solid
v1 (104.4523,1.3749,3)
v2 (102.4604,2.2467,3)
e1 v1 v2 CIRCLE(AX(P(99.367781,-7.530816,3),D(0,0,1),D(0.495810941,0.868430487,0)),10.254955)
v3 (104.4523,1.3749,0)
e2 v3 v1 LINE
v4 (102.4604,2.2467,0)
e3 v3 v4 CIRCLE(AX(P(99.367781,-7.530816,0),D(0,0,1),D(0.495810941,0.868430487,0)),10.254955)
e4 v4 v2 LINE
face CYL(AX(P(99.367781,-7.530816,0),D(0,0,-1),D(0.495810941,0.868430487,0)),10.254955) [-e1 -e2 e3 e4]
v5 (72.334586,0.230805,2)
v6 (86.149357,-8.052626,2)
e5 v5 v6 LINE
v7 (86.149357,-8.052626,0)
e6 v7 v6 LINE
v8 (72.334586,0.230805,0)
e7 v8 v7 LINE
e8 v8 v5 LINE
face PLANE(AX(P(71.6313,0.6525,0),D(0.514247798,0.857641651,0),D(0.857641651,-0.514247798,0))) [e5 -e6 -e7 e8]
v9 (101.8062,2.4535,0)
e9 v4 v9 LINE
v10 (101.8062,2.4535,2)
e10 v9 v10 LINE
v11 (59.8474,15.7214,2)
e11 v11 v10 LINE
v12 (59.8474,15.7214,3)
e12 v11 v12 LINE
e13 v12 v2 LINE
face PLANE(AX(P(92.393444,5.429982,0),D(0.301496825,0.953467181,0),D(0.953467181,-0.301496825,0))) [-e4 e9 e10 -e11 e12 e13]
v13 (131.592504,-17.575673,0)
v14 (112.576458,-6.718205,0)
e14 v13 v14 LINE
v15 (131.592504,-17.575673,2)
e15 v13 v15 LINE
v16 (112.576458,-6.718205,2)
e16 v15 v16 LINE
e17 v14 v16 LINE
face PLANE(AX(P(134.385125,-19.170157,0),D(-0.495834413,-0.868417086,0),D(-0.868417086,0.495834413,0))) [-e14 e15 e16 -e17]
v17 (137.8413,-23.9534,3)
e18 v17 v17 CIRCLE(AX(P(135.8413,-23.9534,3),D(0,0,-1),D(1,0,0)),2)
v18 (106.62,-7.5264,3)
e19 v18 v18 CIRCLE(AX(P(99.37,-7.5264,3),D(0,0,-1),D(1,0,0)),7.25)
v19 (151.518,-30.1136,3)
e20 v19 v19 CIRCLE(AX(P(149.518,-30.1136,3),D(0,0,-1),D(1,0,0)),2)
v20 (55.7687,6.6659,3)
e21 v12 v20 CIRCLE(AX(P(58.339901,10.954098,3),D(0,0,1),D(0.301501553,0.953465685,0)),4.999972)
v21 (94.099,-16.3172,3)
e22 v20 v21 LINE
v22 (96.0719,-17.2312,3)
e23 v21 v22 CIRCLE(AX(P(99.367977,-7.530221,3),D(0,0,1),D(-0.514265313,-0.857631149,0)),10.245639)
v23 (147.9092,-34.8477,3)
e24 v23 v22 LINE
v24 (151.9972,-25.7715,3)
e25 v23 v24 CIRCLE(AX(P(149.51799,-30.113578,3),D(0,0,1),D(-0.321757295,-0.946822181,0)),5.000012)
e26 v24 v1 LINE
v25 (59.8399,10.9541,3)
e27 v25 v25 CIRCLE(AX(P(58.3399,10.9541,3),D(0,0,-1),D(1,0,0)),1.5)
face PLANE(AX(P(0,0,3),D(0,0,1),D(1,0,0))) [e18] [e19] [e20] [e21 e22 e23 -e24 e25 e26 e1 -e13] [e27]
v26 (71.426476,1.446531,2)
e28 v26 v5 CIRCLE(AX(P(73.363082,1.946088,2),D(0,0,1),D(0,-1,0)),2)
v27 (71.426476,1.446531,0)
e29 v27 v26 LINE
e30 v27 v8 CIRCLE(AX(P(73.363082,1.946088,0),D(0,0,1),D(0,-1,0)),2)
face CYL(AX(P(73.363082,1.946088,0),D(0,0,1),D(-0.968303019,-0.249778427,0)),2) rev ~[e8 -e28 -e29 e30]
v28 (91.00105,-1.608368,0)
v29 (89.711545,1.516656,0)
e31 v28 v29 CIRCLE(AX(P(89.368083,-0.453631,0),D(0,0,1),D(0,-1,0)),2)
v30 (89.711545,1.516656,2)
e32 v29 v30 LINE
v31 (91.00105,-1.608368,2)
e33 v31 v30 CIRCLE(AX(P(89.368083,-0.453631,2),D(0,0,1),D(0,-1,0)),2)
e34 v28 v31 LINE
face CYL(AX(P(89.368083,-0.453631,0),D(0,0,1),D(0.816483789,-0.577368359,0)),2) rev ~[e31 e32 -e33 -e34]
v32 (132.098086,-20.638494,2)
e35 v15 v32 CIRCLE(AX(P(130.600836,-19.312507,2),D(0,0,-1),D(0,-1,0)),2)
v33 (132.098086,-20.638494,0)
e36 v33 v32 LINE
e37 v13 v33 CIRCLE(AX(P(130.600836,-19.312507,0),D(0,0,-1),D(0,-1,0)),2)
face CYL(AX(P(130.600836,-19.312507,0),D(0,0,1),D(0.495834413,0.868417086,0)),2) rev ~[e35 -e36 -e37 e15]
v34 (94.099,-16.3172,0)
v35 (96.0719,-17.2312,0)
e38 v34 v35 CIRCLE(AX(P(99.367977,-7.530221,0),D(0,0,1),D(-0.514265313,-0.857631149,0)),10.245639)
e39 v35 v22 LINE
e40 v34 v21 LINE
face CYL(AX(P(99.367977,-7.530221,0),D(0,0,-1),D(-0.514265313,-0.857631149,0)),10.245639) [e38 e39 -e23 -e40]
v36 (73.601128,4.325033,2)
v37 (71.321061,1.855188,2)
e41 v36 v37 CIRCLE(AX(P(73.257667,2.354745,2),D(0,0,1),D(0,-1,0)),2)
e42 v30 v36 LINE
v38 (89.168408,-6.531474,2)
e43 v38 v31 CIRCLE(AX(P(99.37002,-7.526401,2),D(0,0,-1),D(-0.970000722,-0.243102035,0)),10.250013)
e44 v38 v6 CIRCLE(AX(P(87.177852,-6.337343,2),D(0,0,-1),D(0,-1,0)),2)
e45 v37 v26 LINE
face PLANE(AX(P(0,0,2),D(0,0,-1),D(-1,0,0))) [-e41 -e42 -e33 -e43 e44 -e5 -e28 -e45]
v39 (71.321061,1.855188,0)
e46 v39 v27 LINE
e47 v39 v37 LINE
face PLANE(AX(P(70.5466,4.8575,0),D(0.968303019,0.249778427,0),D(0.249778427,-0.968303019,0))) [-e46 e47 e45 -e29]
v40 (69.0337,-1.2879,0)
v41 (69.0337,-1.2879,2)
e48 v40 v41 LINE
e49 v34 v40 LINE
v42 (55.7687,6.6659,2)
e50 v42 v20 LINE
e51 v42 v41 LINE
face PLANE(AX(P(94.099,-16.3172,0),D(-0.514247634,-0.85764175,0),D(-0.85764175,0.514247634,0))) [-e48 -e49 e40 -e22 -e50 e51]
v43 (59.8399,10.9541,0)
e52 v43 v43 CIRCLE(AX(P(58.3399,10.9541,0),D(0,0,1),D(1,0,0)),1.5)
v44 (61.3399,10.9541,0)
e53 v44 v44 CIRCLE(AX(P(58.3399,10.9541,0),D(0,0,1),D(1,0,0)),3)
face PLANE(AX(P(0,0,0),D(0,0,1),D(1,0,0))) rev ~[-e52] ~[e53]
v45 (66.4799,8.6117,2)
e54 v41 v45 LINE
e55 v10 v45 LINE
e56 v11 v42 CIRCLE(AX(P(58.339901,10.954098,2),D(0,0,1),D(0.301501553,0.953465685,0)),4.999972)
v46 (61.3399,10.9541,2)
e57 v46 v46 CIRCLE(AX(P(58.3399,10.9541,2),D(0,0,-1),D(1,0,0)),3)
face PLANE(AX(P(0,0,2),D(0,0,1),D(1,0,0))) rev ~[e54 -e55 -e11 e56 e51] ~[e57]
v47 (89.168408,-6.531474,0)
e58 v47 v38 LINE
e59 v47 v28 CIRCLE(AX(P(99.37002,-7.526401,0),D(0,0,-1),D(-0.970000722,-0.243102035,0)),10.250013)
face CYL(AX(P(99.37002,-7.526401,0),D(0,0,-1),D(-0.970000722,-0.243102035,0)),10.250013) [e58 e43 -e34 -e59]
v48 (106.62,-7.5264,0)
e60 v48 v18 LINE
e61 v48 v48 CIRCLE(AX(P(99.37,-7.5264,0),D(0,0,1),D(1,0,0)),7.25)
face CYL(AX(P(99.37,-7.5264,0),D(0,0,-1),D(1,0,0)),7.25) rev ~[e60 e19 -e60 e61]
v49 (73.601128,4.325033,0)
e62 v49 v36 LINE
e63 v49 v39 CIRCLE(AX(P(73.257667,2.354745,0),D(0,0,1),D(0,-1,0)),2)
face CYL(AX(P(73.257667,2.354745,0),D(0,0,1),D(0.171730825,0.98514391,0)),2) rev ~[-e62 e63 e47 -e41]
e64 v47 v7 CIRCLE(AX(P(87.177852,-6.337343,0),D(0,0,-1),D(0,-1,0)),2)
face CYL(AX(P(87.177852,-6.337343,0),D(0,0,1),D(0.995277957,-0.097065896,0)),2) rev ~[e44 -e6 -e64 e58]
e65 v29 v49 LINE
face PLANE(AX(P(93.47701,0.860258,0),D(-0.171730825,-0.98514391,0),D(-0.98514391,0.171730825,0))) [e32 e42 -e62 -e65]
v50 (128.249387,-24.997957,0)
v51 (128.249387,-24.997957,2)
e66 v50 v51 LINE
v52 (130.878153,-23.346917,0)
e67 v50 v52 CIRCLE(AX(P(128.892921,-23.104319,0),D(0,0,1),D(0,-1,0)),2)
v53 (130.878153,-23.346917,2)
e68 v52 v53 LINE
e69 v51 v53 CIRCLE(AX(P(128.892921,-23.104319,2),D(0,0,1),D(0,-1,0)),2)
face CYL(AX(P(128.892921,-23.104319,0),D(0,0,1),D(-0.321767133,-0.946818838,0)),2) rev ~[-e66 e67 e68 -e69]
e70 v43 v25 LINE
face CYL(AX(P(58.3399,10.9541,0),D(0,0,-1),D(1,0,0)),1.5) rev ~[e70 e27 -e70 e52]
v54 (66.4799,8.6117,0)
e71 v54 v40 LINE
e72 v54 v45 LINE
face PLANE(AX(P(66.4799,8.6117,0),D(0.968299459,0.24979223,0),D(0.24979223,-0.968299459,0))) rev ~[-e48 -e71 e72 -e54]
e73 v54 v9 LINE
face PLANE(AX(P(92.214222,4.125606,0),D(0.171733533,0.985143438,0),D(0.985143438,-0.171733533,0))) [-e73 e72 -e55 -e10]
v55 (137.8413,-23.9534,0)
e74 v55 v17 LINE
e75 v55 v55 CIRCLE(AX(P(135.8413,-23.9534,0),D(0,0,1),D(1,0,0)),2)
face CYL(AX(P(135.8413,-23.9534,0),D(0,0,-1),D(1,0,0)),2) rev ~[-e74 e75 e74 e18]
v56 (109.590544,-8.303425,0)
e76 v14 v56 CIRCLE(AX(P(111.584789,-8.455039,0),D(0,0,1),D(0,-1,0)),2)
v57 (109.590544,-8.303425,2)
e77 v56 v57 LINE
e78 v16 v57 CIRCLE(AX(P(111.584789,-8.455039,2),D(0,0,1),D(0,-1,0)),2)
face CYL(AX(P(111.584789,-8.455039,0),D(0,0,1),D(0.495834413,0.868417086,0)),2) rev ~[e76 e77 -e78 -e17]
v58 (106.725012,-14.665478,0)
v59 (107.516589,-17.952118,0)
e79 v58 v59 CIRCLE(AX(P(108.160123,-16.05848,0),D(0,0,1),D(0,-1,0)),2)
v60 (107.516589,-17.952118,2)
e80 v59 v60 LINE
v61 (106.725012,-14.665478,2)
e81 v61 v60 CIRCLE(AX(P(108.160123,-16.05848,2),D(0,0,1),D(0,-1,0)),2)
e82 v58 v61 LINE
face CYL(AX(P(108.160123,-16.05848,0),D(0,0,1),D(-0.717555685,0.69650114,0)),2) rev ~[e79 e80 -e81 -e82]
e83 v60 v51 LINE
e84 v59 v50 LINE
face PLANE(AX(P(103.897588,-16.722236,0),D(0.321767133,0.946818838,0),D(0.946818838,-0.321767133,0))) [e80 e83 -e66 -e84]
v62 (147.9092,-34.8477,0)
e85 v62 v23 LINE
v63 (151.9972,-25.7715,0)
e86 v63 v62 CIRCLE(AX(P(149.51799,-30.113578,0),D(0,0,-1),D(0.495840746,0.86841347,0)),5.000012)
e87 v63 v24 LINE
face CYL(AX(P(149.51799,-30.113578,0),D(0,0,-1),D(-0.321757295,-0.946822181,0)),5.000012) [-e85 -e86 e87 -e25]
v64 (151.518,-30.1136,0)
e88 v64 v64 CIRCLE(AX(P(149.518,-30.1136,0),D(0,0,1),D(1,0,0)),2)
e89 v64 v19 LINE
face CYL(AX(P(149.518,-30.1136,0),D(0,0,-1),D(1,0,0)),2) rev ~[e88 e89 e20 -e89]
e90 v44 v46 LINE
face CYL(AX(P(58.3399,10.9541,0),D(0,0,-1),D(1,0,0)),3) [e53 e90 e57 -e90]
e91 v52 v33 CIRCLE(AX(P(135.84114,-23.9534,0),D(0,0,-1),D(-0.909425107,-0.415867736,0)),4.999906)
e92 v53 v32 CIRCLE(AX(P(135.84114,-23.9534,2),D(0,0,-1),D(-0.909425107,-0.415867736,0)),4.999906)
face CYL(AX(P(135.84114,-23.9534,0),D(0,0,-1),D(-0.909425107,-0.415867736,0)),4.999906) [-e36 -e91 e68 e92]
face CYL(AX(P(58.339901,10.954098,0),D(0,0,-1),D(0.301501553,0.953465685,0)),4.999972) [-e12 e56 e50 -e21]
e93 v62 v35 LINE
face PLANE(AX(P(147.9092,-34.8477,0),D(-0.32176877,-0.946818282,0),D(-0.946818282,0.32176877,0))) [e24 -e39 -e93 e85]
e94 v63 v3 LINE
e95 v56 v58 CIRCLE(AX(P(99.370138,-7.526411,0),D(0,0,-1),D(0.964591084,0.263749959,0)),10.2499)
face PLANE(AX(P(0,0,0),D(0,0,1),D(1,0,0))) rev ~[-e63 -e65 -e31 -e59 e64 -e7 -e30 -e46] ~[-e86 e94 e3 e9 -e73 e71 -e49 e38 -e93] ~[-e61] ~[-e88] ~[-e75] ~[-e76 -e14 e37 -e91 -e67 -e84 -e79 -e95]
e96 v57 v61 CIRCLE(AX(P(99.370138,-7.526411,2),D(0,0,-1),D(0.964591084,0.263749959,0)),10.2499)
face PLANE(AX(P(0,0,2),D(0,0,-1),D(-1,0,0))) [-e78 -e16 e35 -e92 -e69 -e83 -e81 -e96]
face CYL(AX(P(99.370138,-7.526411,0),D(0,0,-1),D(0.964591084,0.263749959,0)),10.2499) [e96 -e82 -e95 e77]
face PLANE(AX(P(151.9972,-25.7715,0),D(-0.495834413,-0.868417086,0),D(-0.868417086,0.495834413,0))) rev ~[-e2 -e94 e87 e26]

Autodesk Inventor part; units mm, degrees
ref_plane "YZ Plane" through (0, 0, 0) normal (1, 0, 0) x (0, 1, 0)
ref_plane "XZ Plane" through (0, 0, 0) normal (0, 1, 0) x (-1, 0, 0)
ref_plane "XY Plane" through (0, 0, 0) normal (0, 0, 1) x (1, 0, 0)
sketch "スケッチ1" plane through (0, 0, 0) normal (0, 0, 1) x (1, 0, 0)
  line L0 (-170.6512, -31.4118) -> (202.8656, -31.4118) construction
  circle A0 centre (-14, -17.4118) radius 14 construction
  circle A1 centre (14, -17.4118) radius 14 construction
  circle A2 centre (-28.0204, 0.0121) radius 20.05 construction
  circle A3 centre (-28.0204, 0.0121) radius 5.05 construction
  circle A4 centre (8.8763, 3.8907) radius 32.05 construction
  circle A5 centre (8.8763, 3.8907) radius 10.1 construction
  circle A6 centre (54.047, 13.5882) radius 36.1 construction
  line L1 (-170.915, -81.4118) -> (490.0044, -81.4118)
  circle A7 centre (-28.0204, 0.0121) radius 22.342 construction
  circle A8 centre (-39.4931, 19.1835) radius 14 construction
  circle A9 centre (-49.0547, 7.5438) radius 14 construction
  circle A10 centre (-49.0547, -7.5196) radius 14 construction
  circle A11 centre (-39.4931, -19.1593) radius 14 construction
  circle A12 centre (8.8763, 3.8907) radius 33.05 construction
  circle A13 centre (54.047, 13.5882) radius 38.1 construction
  line L2 (-11.5565, -29.1593) -> (4.2969, -29.1593) construction
  line L3 (-67.2952, 44.8622) -> (-67.2952, -57.3934) construction
  line L4 (-149.4523, -1.6098) -> (-132.6633, -31.6026)
  line L5 (-132.7701, -31.4118) -> (-132.7701, 74.0456)
  circle A14 centre (-11.4931, -19.1593) radius 14 construction
  line L6 (-197.2268, -33.1593) -> (179.6604, -33.1593) construction
  circle A15 centre (54.047, 13.5882) radius 4.025 construction
  circle A16 centre (54.047, 13.5882) radius 6 construction
  circle A17 centre (-39.4931, 19.1835) radius 5
  circle A18 centre (-49.0547, 7.5438) radius 5
  circle A19 centre (-49.0547, -7.5196) radius 5
  circle A20 centre (-39.4931, -19.1593) radius 5
  circle A21 centre (-39.4931, 19.1835) radius 8 construction
  circle A22 centre (-49.0547, 7.5438) radius 8 construction
  circle A23 centre (-49.0547, -7.5196) radius 8 construction
  circle A24 centre (-39.4931, -19.1593) radius 8 construction
  circle A25 centre (-28.0204, 0.0121) radius 4.5
  circle A26 centre (8.8763, 3.8907) radius 7.5
  line L7 (-17.5497, 32.3149) -> (-46.3578, 15.0755) construction
  line L8 (-46.3578, 15.0755) -> (-51.7515, 0.0121) construction
  line L9 (-51.7515, 0.0121) -> (-46.3578, -15.0513) construction
  line L10 (-46.3578, -15.0513) -> (-37.9391, -20.0892) construction
  circle A27 centre (-32.6283, 23.2915) radius 1.3
  circle A28 centre (-46.3578, 15.0755) radius 1.3
  circle A29 centre (-51.7515, 0.0121) radius 1.3
  circle A30 centre (-46.3578, -15.0513) radius 1.3
  circle A31 centre (-32.6283, -23.2673) radius 1.3
  line L11 (-67.2952, 23.1796) -> (-67.2952, -18.1327)
  arc A32 (79.2003, -37.212) -> (87.3507, -31.2711) centre (80.4159, -30.3183) ccw
  arc A33 (8.1864, 50.8943) -> (0.9804, 51.9708) centre (3.7003, 45.5208) ccw
  line L12 (-52.2685, -33.1593) -> (56.2168, -33.1593)
  line L13 (56.2168, -33.1593) -> (79.2003, -37.212)
  arc A34 (92.7831, 8.2659) -> (29.742, 44.2162) centre (54.047, 13.5882) ccw
  line L14 (87.3507, -31.2711) -> (92.7831, 8.2659)
  line L15 (0.9804, 51.9708) -> (-67.2952, 23.1796)
  circle A35 centre (34.0114, -24.0061) radius 4.5 construction
  circle A36 centre (34.0114, -24.0061) radius 1.5
  circle A37 centre (-21.4477, 26.0369) radius 4.5 construction
  circle A38 centre (-21.4477, 26.0369) radius 1.5
  circle A39 centre (-56.0504, 23.0377) radius 1.5
  circle A40 centre (-56.0504, 23.0377) radius 3 construction
  circle A41 centre (-56.0504, 23.0377) radius 4.5 construction
  circle A42 centre (-64.2952, 0.0121) radius 1.5
  circle A43 centre (-64.2952, 0.0121) radius 3 construction
  circle A44 centre (-64.2952, 0.0121) radius 4.3311 construction
  line L16 (54.047, 13.5882) -> (99.37, -7.5264)
  line L17 (99.37, -7.5264) -> (58.3399, 10.9541)
  line L18 (58.3399, 10.9541) -> (30.7326, 32.4678)
  line L19 (30.7326, 32.4678) -> (54.047, 13.5882)
  line L20 (99.37, -7.5264) -> (491.4359, -184.1173)
  line L21 (-183.2789, 162.2213) -> (-183.2789, -125.2315)
  line L22 (516.7211, 155.5913) -> (516.7211, -155.5644)
  circle A45 centre (99.37, -7.5264) radius 7.25
  line L23 (149.518, -30.1136) -> (397.5027, -198.9436) construction
  line L24 (220.2014, -78.2354) -> (225.3858, -8.4277) construction
  circle A46 centre (3.7003, 45.5208) radius 4
  circle A47 centre (135.8413, -23.9534) radius 2
  circle A48 centre (149.518, -30.1136) radius 2
  arc A49 (147.9092, -34.8477) -> (151.9972, -25.7715) centre (149.518, -30.1136) ccw
  line L25 (147.9092, -34.8477) -> (96.0719, -17.2312)
  line L26 (151.9972, -25.7715) -> (104.4523, 1.3749)
  circle A50 centre (30.7326, 32.4678) radius 2
  circle A51 centre (-16.1798, -24.0771) radius 4.5 construction
  circle A52 centre (-16.1798, -24.0771) radius 1.5
  line L27 (-67.2952, -18.1327) -> (-52.2685, -33.1593)
  circle A53 centre (-56.0504, -23.0135) radius 1.5
  circle A54 centre (-56.0504, -23.0135) radius 3 construction
  circle A55 centre (30.7326, 32.4678) radius 4
  arc A56 (56.8403, 15.6972) -> (51.3644, 11.3402) centre (54.047, 13.5882) ccw construction
  line L28 (96.4916, -6.1854) -> (101.9705, -5.7041) construction
  line L29 (101.9705, -5.7041) -> (99.6479, -10.6896) construction
  line L30 (99.6479, -10.6896) -> (96.4916, -6.1854) construction
  circle A57 centre (99.6479, -10.6896) radius 1.5
  circle A58 centre (101.9705, -5.7041) radius 1.5
  circle A59 centre (96.4916, -6.1854) radius 1.5
  circle A60 centre (99.37, -7.5264) radius 6
  arc A61 (97.7876, -15.8778) -> (97.5111, 0.7679) centre (99.37, -7.5264) ccw
  arc A62 (56.8403, 15.6972) -> (97.5111, 0.7679) centre (88.7632, 39.7996) ccw
  arc A63 (51.3644, 11.3402) -> (97.7876, -15.8778) centre (112.6811, 62.7237) ccw
  circle A64 centre (54.047, 13.5882) radius 8.5 construction
  line L31 (102.9595, 0.1786) -> (57.6365, 21.2931) construction
  line L32 (50.4575, 5.8833) -> (95.7806, -15.2313) construction
  circle A65 centre (12.7384, 41.2415) radius 3 construction
  circle A66 centre (12.7384, 41.2415) radius 4.5 construction
  circle A67 centre (12.7384, 41.2415) radius 1.5
  circle A68 centre (80.4159, -30.3183) radius 4
  circle A69 centre (69.7531, -26.0108) radius 1.5
  circle A70 centre (69.7531, -26.0108) radius 4.5 construction
  circle A71 centre (-56.0504, -23.0135) radius 4.5 construction
  line L33 (8.1864, 50.8943) -> (15.9809, 44.3871)
  arc A72 (15.9809, 44.3871) -> (29.742, 44.2162) centre (22.9664, 52.7545) ccw
  circle A73 centre (-5.4761, 38.5895) radius 1.5
  circle A74 centre (-5.4761, 38.5895) radius 4.5 construction
  circle A75 centre (54.047, 13.5882) radius 50 construction
  circle A76 centre (3.7003, 45.5208) radius 2
  circle A77 centre (80.4159, -30.3183) radius 2
  circle A78 centre (54.047, 13.5882) radius 1.5
  circle A79 centre (58.3399, 10.9541) radius 1.5
  circle A80 centre (58.3399, 10.9541) radius 3
  arc A81 (59.8474, 15.7214) -> (55.7687, 6.6659) centre (58.3399, 10.9541) ccw
  line L34 (94.099, -16.3172) -> (55.7687, 6.6659)
  line L35 (59.8474, 15.7214) -> (102.4604, 2.2467)
  arc A82 (104.4523, 1.3749) -> (102.4604, 2.2467) centre (99.37, -7.5264) ccw
  arc A83 (94.099, -16.3172) -> (96.0719, -17.2312) centre (99.37, -7.5264) ccw
  circle A84 centre (30.7326, 32.4678) radius 5.025
  circle A85 centre (30.7326, 32.4678) radius 8.025
  circle A86 centre (58.3399, 10.9541) radius 4.025
  circle A87 centre (58.3399, 10.9541) radius 7.025
  line L36 (25.9827, 25.9995) -> (54.1819, 5.2918)
  line L37 (53.3095, 15.8577) -> (37.1861, 27.6978)
  line L38 (65.3516, 11.3852) -> (66.2721, -3.5865)
  line L39 (66.2721, -3.5865) -> (54.1819, 5.2918)
  line L40 (66.4799, 8.6117) -> (69.0337, -1.2879)
  line L41 (66.4799, 8.6117) -> (101.8062, 2.4535)
  point P0 (0, 0)
  point P1 (0, 0)
  point P2 (-49.0547, 7.5438)
  point P3 (-49.0547, -7.5196)
  dimension "d88" = 100
  dimension "d0" = 40.1
  dimension "d1" = 10.1
  dimension "d2" = 64.1
  dimension "d3" = 20.2
  dimension "d4" = 72.2
  dimension "d5" = 95
  dimension "d6" = 44.684
  dimension "d7" = 28
  dimension "d8" = 28
  dimension "d9" = 28
  dimension "d10" = 28
  dimension "d11" = 1
  dimension "d12" = 2
  dimension "d13" = 4
  dimension "d14" = 8.05
  dimension "d15" = 12
  dimension "d16" = 10
  dimension "d17" = 10
  dimension "d18" = 10
  dimension "d19" = 10
  dimension "d20" = 3
  dimension "d21" = 3
  dimension "d22" = 3
  dimension "d23" = 3
  dimension "d24" = 9
  dimension "d25" = 15
  dimension "d26" = 2.6
  dimension "d27" = 2.6
  dimension "d28" = 2.6
  dimension "d29" = 2.6
  dimension "d30" = 2.6
  dimension "d31" = 1
  dimension "d32" = 9
  dimension "d33" = 3
  dimension "d34" = 9
  dimension "d35" = 3
  dimension "d36" = 3
  dimension "d37" = 6
  dimension "d38" = 9
  dimension "d39" = 3
  dimension "d40" = 6
  dimension "d41" = 50
  dimension "d42" = 45
  dimension "d43" = 35
  dimension "d44" = 30
  dimension "d45" = 39
  dimension "d46" = 430
  dimension "d47" = 700
  dimension "d48" = 14.5
  dimension "d49" = 300
  dimension "d50" = 10
  dimension "d51" = 70
  dimension "d52" = 120
  dimension "d53" = 140
  dimension "d54" = 8
  dimension "d55" = 4
  dimension "d56" = 4
  dimension "d57" = 15
  dimension "d58" = 40
  dimension "d59" = 10
  dimension "d60" = 4
  dimension "d61" = 9
  dimension "d62" = 3
  dimension "d63" = 3
extrude "押し出し1" add sketch "スケッチ1" along normal blind 3 contours L35 L41 L14 | L14 L41 L40 L16 L38 A87 L35 | L34 L40 A62 L17 L14 | L14 L17 A45 L20 A61 A63 L34 | A63 A61 L20 A47 A48 A49 L25 A83 L34 | L41 L35 A82 L26 A49 L20 A48 A47 A61 A62 L14 | L14 A62 L16 L40 L41 | A87 L16 A62 A86 A78 A81 L35 | L17 A62 L16 L14 | L14 L16 A45 L17 | L34 L38 A62 L40 | L34 A87 A62 L38 | A62 A61 L20 A45 L16 L14 | L14 L16 A62 | L38 L16 A87 | A62 L40 L17 | L17 L40 L16 A62 | A62 L38 L17 L40 | A81 A63 | A63 A81 A78 A86 L17 A62 A87 L34 | A62 A87 L17 L38 | L40 L17 L38 L16 | A78 A86 L18 A81 | L38 L17 A87 L16 | A62 L17 A87 | A86 A62 A80 L18 A78 | A78 L18 A86 | L18 A86 L16 A81 | A87 L17 A62 L16 | A81 L16 A86 A78 | L17 A86 L16 A62 | A86 A62 A80 | L18 A78 L16 A86 | L16 A86 A62 | A86 L16 A78 | A78 L16 A80 L17 A86 | L17 A80 L16 A86 | L18 A80 L16 A78 | A80 A62 | A62 A80 L16 A79 L18 | L16 A80 A62 A86 | A80 L16 L18 A79 L17 | L17 A79 L16 A80 | L18 L16 A80 | L16 A79 L18
extrude "押し出し2" cut sketch "スケッチ1" along normal blind 2 contours L35 L41 L14 | L14 L41 L40 L16 L38 A87 L35 | A87 L16 A62 A86 A78 A81 L35 | L34 L38 A62 L40 | L34 A87 A62 L38 | L38 L16 A87 | A62 L38 L17 L40 | A81 A63 | A63 A81 A78 A86 L17 A62 A87 L34 | A62 A87 L17 L38 | L40 L17 L38 L16 | A78 A86 L18 A81 | L38 L17 A87 L16 | A62 L17 A87 | A86 A62 A80 L18 A78 | A78 L18 A86 | L18 A86 L16 A81 | A87 L17 A62 L16 | A81 L16 A86 A78 | L17 A86 L16 A62 | A86 A62 A80 | L18 A78 L16 A86 | L16 A86 A62 | A86 L16 A78 | A78 L16 A80 L17 A86 | L17 A80 L16 A86 | L18 A80 L16 A78 | L16 A80 A62 A86
sketch "スケッチ3" plane through (0, 0, 0) normal (0, 0, -1) x (-1, 0, 0)
  line L0 (-66.4799, 8.6117) -> (-101.8062, 2.4535) projected
  line L1 (-102.4604, 2.2467) -> (-101.8062, 2.4535) projected
  arc A0 (-102.4604, 2.2467) -> (-104.4523, 1.3749) centre (-99.37, -7.5264) ccw projected
  line L2 (-151.9972, -25.7715) -> (-104.4523, 1.3749) projected
  arc A1 (-151.9972, -25.7715) -> (-147.9092, -34.8477) centre (-149.518, -30.1136) ccw projected
  line L3 (-96.0719, -17.2312) -> (-147.9092, -34.8477) projected
  arc A2 (-96.0719, -17.2312) -> (-94.099, -16.3172) centre (-99.37, -7.5264) ccw projected
  line L4 (-69.0337, -1.2879) -> (-94.099, -16.3172) projected
  line L5 (-69.0337, -1.2879) -> (-66.4799, 8.6117) projected
  circle A3 centre (-135.8413, -23.9534) radius 2 projected
  circle A4 centre (-149.518, -30.1136) radius 2 projected
  circle A5 centre (-99.37, -7.5264) radius 7.25 projected
  arc A6 (-101.5559, -0.6137) -> (-102.9648, -1.2303) centre (-99.37, -7.5264) ccw
  line L6 (-101.5559, -0.6137) -> (-101.0932, -0.4674)
  line L7 (-101.0932, -0.4674) -> (-70.5466, 4.8575)
  line L8 (-70.5466, 4.8575) -> (-71.6313, 0.6525)
  line L9 (-71.6313, 0.6525) -> (-95.6417, -13.7443)
  arc A7 (-97.0372, -14.3908) -> (-95.6417, -13.7443) centre (-99.37, -7.5264) ccw
  line L10 (-97.0372, -14.3908) -> (-148.8745, -32.0072)
  arc A8 (-150.5097, -28.3767) -> (-148.8745, -32.0072) centre (-149.518, -30.1136) ccw
  line L11 (-150.5097, -28.3767) -> (-102.9648, -1.2303)
  arc A9 (-131.2941, -26.0327) -> (-134.3851, -19.1702) centre (-135.8413, -23.9534) ccw
  arc A10 (-109.2571, -4.823) -> (-103.8976, -16.7222) centre (-99.37, -7.5264) ccw
  arc A11 (-89.4275, -10.0182) -> (-93.477, 0.8602) centre (-99.37, -7.5264) ccw
  point P0 (0, 0)
  dimension "d111" = 3
  dimension "d113" = 3
  dimension "d114" = 3
  dimension "d115" = 3
extrude "押し出し3" cut sketch "スケッチ3" against normal blind 2 contours L11 A10 L10 A9 | A11 L7 L8 L9
fillet "フィレット1" radius 2 8 edges at (134.3851, -19.1702, 1) (131.2941, -26.0327, 1) (103.8976, -16.7222, 1) (109.2571, -4.823, 1) (93.477, 0.8602, 1) (89.4275, -10.0182, 1) (71.6313, 0.6525, 1) (70.5466, 4.8575, 1)
sketch "スケッチ4" plane through (0, 0, 0) normal (0, 0, -1) x (-1, 0, 0)
  arc A0 (-89.1684, -6.5314) -> (-91.0011, -1.6084) centre (-99.37, -7.5264) ccw projected
  arc A1 (-89.7115, 1.5167) -> (-91.0011, -1.6084) centre (-89.3681, -0.4536) ccw projected
  line L0 (-89.7115, 1.5167) -> (-73.6012, 4.325) projected
  arc A2 (-71.3211, 1.8552) -> (-73.6012, 4.325) centre (-73.2577, 2.3548) ccw projected
  line L1 (-71.3211, 1.8552) -> (-71.4265, 1.4465) projected
  arc A3 (-72.3346, 0.2308) -> (-71.4265, 1.4465) centre (-73.3631, 1.9461) ccw projected
  line L2 (-72.3346, 0.2308) -> (-86.1494, -8.0526) projected
  arc A4 (-89.1684, -6.5314) -> (-86.1494, -8.0526) centre (-87.1779, -6.3373) ccw projected
  arc A5 (-130.8782, -23.3469) -> (-132.0981, -20.6385) centre (-135.8413, -23.9534) ccw projected
  arc A6 (-131.5925, -17.5757) -> (-132.0981, -20.6385) centre (-130.6008, -19.3125) ccw projected
  line L3 (-131.5925, -17.5757) -> (-112.5765, -6.7182) projected
  arc A7 (-109.5905, -8.3034) -> (-112.5765, -6.7182) centre (-111.5848, -8.4551) ccw projected
  arc A8 (-109.5905, -8.3034) -> (-106.725, -14.6655) centre (-99.37, -7.5264) ccw projected
  arc A9 (-107.5166, -17.9521) -> (-106.725, -14.6655) centre (-108.1601, -16.0585) ccw projected
  line L4 (-107.5166, -17.9521) -> (-128.2494, -24.998) projected
  arc A10 (-130.8782, -23.3469) -> (-128.2494, -24.998) centre (-128.893, -23.1043) ccw projected
  line L5 (-66.4799, 8.6117) -> (-101.8062, 2.4535) projected
  line L6 (-102.4604, 2.2467) -> (-101.8062, 2.4535) projected
  arc A11 (-102.4604, 2.2467) -> (-104.4523, 1.3749) centre (-99.37, -7.5264) ccw projected
  line L7 (-151.9972, -25.7715) -> (-104.4523, 1.3749) projected
  arc A12 (-151.9972, -25.7715) -> (-147.9092, -34.8477) centre (-149.518, -30.1136) ccw projected
  line L8 (-96.0719, -17.2312) -> (-147.9092, -34.8477) projected
  arc A13 (-96.0719, -17.2312) -> (-94.099, -16.3172) centre (-99.37, -7.5264) ccw projected
  line L9 (-69.0337, -1.2879) -> (-94.099, -16.3172) projected
  line L10 (-69.0337, -1.2879) -> (-66.4799, 8.6117) projected
  circle A14 centre (-135.8413, -23.9534) radius 2 projected
  circle A15 centre (-149.518, -30.1136) radius 2 projected
  circle A16 centre (-99.37, -7.5264) radius 7.25 projected
  arc A17 (-55.7687, 6.6659) -> (-59.8474, 15.7214) centre (-58.3399, 10.9541) ccw projected
  line L11 (-101.8062, 2.4535) -> (-59.8474, 15.7214) projected
  line L12 (-66.4799, 8.6117) -> (-101.8062, 2.4535) projected
  line L13 (-69.0337, -1.2879) -> (-66.4799, 8.6117) projected
  line L14 (-55.7687, 6.6659) -> (-69.0337, -1.2879) projected
  circle A18 centre (-58.3399, 10.9541) radius 3 projected
  arc A19 (-151.9972, -25.7715) -> (-147.9092, -34.8477) centre (-149.518, -30.1136) ccw projected
  line L15 (-151.9972, -25.7715) -> (-104.4523, 1.3749) projected
  arc A20 (-102.4604, 2.2467) -> (-104.4523, 1.3749) centre (-99.37, -7.5264) ccw projected
  line L16 (-102.4604, 2.2467) -> (-59.8474, 15.7214) projected
  arc A21 (-55.7687, 6.6659) -> (-59.8474, 15.7214) centre (-58.3399, 10.9541) ccw projected
  line L17 (-55.7687, 6.6659) -> (-94.099, -16.3172) projected
  arc A22 (-96.0719, -17.2312) -> (-94.099, -16.3172) centre (-99.37, -7.5264) ccw projected
  line L18 (-96.0719, -17.2312) -> (-147.9092, -34.8477) projected
  circle A23 centre (-135.8413, -23.9534) radius 2 projected
  circle A24 centre (-149.518, -30.1136) radius 2 projected
  circle A25 centre (-99.37, -7.5264) radius 7.25 projected
  circle A26 centre (-58.3399, 10.9541) radius 1.5 projected
  arc A27 (-102.2781, 4.4966) -> (-101.8062, 2.4535) centre (-101.9865, 3.4879) ccw
  arc A28 (-69.0337, -1.2879) -> (-67.4295, -2.4205) centre (-68.017, -1.5502) ccw
  line L19 (-66.4799, 8.6117) -> (-101.8062, 2.4535) projected
  line L20 (-102.2781, 4.4966) -> (-60.0063, 16.718)
  line L21 (-67.4295, -2.4205) -> (-54.983, 5.981)
  arc A29 (-54.983, 5.981) -> (-60.0063, 16.718) centre (-58.3399, 10.9541) ccw
  point P0 (0, 0)
  dimension "d119" = 2.1
  dimension "d120" = 2.1
  dimension "d121" = 1
properties part number "アーム中間節" material "アルミニウム 7075"
